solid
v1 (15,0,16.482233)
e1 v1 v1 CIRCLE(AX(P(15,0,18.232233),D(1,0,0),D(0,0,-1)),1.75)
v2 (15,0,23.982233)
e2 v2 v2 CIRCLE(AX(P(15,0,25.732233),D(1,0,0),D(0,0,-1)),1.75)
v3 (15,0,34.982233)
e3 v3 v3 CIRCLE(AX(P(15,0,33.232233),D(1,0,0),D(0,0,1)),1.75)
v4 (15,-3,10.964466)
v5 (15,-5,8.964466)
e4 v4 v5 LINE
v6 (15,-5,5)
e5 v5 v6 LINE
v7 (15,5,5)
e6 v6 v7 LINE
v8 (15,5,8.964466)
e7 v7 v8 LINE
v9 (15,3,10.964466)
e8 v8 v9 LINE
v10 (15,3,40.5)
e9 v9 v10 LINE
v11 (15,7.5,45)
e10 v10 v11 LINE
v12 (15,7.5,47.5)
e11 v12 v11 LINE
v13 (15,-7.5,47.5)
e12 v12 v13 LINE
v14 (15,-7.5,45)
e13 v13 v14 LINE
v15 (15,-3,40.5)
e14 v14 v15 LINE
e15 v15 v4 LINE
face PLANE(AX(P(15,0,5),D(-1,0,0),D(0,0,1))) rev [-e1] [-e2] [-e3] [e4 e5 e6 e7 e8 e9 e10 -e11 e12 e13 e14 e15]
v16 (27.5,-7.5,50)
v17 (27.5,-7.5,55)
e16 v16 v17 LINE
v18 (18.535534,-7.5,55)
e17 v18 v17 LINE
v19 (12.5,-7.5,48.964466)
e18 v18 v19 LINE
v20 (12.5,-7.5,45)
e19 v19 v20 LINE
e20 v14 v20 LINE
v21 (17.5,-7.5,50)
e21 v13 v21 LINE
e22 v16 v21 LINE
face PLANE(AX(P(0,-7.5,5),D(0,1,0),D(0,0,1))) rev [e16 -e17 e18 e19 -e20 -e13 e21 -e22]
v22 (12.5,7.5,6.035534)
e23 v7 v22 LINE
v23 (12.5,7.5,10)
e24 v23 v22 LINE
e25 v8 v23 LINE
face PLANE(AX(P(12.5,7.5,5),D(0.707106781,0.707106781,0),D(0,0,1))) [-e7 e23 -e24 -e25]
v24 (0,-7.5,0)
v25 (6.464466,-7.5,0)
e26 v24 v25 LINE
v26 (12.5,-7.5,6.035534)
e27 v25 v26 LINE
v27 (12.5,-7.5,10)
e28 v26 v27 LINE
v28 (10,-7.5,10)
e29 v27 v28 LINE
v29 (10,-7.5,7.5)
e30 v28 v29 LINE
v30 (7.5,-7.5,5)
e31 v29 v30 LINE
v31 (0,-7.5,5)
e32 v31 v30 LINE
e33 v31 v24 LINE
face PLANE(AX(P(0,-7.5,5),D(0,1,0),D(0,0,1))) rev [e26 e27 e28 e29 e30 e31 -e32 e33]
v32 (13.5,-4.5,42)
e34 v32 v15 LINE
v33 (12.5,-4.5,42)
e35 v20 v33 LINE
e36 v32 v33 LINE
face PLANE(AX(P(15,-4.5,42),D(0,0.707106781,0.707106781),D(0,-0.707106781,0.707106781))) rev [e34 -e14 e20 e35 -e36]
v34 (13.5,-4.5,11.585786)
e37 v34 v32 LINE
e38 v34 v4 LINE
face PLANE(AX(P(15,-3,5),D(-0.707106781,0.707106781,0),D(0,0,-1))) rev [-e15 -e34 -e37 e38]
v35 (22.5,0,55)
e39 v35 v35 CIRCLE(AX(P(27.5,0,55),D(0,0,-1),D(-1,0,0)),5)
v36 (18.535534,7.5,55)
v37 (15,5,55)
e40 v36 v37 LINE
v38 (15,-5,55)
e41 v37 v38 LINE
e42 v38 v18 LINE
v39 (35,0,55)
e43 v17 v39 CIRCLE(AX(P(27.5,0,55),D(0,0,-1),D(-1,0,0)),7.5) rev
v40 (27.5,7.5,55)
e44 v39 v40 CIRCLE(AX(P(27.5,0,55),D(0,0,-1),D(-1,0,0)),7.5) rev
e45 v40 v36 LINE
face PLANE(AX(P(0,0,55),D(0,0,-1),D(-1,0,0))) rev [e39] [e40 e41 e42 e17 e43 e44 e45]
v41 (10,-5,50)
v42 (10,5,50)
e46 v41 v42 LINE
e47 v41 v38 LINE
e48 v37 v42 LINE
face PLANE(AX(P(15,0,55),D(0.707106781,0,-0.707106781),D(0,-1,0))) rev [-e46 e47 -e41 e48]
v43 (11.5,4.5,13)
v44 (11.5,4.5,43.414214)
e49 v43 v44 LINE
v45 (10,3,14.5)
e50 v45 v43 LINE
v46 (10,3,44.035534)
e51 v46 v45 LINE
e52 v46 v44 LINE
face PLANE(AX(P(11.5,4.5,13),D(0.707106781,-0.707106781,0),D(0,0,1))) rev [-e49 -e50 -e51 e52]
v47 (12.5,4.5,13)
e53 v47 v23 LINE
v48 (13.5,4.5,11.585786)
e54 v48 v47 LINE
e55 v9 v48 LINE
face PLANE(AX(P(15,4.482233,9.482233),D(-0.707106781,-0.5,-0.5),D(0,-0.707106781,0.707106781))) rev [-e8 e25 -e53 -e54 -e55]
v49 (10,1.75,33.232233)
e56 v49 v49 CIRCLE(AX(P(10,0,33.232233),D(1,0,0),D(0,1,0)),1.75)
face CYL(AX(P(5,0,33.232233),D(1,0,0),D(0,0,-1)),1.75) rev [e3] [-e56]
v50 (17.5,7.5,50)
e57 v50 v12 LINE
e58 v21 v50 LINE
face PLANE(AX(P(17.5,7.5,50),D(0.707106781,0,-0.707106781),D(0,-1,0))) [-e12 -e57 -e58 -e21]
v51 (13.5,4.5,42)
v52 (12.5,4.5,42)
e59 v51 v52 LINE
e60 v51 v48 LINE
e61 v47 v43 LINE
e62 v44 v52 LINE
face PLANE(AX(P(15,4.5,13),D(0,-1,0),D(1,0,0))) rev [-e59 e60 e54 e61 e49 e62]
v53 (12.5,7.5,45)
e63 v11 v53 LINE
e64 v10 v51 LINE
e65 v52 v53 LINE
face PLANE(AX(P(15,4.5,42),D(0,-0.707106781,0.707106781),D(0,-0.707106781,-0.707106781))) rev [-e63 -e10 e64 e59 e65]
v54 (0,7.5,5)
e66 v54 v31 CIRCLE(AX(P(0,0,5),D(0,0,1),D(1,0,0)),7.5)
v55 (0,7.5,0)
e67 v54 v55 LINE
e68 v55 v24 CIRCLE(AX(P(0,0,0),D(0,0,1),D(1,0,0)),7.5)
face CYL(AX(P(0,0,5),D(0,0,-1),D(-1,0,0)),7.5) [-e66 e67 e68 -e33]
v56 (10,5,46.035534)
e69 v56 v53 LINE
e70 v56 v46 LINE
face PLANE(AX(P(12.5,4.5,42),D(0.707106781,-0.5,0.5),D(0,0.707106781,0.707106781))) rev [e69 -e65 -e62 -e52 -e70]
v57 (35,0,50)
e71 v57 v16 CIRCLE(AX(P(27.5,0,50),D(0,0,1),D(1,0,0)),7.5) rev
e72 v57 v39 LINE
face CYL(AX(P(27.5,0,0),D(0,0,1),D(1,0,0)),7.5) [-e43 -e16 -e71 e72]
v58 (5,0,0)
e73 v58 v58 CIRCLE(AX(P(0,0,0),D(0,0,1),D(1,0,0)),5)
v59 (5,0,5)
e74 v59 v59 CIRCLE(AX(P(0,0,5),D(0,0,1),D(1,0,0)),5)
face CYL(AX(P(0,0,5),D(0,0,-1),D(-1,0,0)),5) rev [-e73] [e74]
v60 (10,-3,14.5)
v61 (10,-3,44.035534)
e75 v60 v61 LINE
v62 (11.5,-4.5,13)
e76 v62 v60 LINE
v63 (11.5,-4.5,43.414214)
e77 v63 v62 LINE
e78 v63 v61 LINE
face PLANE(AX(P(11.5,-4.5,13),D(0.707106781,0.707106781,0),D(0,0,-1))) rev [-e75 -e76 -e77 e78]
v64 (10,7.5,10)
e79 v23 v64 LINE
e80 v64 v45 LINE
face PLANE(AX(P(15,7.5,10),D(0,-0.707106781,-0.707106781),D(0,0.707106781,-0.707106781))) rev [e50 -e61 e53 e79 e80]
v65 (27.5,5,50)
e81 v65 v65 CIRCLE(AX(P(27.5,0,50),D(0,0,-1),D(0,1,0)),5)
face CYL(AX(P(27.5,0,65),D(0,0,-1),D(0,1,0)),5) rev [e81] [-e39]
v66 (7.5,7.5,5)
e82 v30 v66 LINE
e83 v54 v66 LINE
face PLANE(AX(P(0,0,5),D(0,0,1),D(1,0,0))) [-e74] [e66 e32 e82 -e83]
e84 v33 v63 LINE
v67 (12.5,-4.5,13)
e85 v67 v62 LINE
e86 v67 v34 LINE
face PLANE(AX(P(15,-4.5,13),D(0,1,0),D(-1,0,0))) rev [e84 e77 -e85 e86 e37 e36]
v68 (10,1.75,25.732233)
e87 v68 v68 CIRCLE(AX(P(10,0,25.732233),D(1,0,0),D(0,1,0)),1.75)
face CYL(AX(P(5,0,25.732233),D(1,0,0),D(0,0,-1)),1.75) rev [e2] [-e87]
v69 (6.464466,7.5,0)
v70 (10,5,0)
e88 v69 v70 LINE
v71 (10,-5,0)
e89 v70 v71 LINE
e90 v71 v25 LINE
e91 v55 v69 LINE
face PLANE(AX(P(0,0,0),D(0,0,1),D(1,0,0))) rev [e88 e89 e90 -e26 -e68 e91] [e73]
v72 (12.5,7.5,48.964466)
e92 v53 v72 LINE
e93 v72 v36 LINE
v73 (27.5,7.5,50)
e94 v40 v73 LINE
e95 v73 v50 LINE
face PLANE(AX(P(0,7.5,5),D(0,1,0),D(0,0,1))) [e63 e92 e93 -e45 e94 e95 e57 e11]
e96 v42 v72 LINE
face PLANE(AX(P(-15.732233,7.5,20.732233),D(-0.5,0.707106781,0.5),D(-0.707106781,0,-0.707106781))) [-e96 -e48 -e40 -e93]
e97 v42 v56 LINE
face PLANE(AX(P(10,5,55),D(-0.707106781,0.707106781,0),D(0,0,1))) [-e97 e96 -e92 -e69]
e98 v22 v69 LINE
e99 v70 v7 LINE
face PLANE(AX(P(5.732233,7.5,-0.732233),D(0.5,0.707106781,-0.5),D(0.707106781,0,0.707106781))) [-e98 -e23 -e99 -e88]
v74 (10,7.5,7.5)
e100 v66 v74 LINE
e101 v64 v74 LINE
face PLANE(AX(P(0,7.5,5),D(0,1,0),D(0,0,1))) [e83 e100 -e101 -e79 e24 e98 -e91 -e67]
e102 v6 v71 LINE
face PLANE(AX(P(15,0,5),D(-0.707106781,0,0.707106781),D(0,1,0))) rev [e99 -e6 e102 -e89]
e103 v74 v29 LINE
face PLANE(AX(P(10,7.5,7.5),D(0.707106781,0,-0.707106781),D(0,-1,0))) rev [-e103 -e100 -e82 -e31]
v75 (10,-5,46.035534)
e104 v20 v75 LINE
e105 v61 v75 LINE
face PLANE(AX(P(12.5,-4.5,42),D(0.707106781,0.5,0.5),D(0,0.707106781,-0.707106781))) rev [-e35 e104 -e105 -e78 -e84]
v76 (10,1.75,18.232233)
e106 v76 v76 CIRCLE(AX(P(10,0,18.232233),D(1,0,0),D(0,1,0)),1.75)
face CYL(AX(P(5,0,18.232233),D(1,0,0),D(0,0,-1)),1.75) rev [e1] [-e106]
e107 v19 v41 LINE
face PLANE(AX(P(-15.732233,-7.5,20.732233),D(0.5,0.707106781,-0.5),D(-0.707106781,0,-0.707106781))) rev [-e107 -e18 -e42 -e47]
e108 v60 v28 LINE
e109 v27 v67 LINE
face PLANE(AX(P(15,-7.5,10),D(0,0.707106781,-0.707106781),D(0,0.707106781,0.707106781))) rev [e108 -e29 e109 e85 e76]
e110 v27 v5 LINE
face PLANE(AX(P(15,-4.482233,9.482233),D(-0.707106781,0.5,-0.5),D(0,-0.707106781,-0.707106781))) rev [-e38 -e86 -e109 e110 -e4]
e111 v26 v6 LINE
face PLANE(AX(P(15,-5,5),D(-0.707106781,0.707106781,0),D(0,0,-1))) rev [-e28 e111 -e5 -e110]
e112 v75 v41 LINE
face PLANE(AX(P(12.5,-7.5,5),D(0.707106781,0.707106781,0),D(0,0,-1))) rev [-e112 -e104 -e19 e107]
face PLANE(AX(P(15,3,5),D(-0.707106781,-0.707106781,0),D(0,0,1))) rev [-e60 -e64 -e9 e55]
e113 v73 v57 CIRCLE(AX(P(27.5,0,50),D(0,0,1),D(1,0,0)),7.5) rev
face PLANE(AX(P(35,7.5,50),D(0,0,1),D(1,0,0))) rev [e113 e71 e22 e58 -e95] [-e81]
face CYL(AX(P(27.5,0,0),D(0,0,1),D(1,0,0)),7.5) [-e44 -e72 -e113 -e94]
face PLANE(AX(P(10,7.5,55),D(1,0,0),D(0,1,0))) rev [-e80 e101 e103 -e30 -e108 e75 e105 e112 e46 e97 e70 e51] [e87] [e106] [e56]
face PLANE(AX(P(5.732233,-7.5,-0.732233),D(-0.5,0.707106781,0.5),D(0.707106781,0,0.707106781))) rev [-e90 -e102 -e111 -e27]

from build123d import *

# Parameters (mm, degrees)
SKETCH1_R           = 7.5
SKETCH1_R_2         = 5
BOSS_EXTRUDE1_DEPTH = 5
SKETCH2_W           = 5
SKETCH2_H           = 15
BOSS_EXTRUDE2_DEPTH = 50
SKETCH3_W           = 5
SKETCH3_H           = 15
BOSS_EXTRUDE3_DEPTH = 20
SKETCH4_R           = 5
CUT_EXTRUDE1_DEPTH  = 15
FILLET1_R           = 7.5
CHAMFER1_SIZE       = 5
CUT_EXTRUDE2_DEPTH  = 5
CHAMFER2_SIZE       = 1.5
CHAMFER3_SIZE       = 2.5
CHAMFER4_SIZE       = 2.5
SKETCH10_R          = 1.75
CUT_EXTRUDE4_DEPTH  = 10


with BuildPart() as part:
    # Sketch1 → Boss-Extrude1 (new body)
    # profile 1 of 2: a face of its own
    with BuildSketch(Plane.XY):
        Circle(SKETCH1_R)
        Circle(SKETCH1_R_2, mode=Mode.SUBTRACT)
    # profile 2 of 2: a face of its own
    with BuildSketch(Plane.XY):
        with BuildLine():
            Line((15, 7.5), (0, 7.5))
            ThreePointArc((0, 7.5), (5.303300859, 5.303300859), (7.5, 0))
            ThreePointArc((7.5, 0), (5.303300859, -5.303300859), (0, -7.5))
            Line((0, -7.5), (15, -7.5))
            Line((15, -7.5), (15, 7.5))
        make_face()
    extrude(amount=BOSS_EXTRUDE1_DEPTH)

    # Sketch2 → Boss-Extrude2 (add)
    with BuildSketch(Plane.XY.offset(5)):
        with Locations((12.5, 0)):
            Rectangle(SKETCH2_W, SKETCH2_H)
    extrude(amount=BOSS_EXTRUDE2_DEPTH)

    # Sketch3 → Boss-Extrude3 (add)
    with BuildSketch(Plane(origin=(15, 0, 0), x_dir=(0, 0, -1), z_dir=(1, 0, 0))):
        with Locations((-52.5, 0)):
            Rectangle(SKETCH3_W, SKETCH3_H)
    extrude(amount=BOSS_EXTRUDE3_DEPTH)

    # Sketch4 → Cut-Extrude1 (cut)
    with BuildSketch(Plane(origin=(0, 0, 50), x_dir=(-1, 0, 0), z_dir=(0, 0, -1))):
        with Locations(Location((-27.5, 0, 0), (0, 0, 90))):
            Circle(SKETCH4_R)
    extrude(amount=-CUT_EXTRUDE1_DEPTH, mode=Mode.SUBTRACT)

    # Fillet1
    fillet1_edges = [part.edges().sort_by_distance(p)[0] for p in [
        (35, -7.5, 52.5),
        (35, 7.5, 52.5),
    ]]
    fillet(fillet1_edges, radius=FILLET1_R - 0.0001)  # a hair under: the kernel refuses the full size

    # Chamfer1
    chamfer1_edges = [part.edges().sort_by_distance(p)[0] for p in [
        (10, 0, 55),
        (15, 0, 0),
    ]]
    chamfer(chamfer1_edges, length=CHAMFER1_SIZE)

    # Sketch5 → Cut-Extrude2 (cut)
    with BuildSketch(Plane.ZY.offset(-10)):
        Polygon((10, -7.5), (13, -4.5), (42, -4.5), (45, -7.5), align=None)
        Polygon((45, 7.5), (10, 7.5), (13, 4.5), (42, 4.5), align=None)
    extrude(amount=-CUT_EXTRUDE2_DEPTH, mode=Mode.SUBTRACT)

    # Chamfer2
    chamfer2_edges = [part.edges().sort_by_distance(p)[0] for p in [
        (15, -4.5, 27.5),
        (10, -4.5, 27.5),
        (15, 4.5, 27.5),
        (10, 4.5, 27.5),
    ]]
    chamfer(chamfer2_edges, length=CHAMFER2_SIZE)

    # Chamfer3
    chamfer3_edges = [part.edges().sort_by_distance(p)[0] for p in [
        (10, 7.5, 47.5),
        (12.5, 7.5, 52.5),
        (12.5, 7.5, 2.5),
        (10, -7.5, 47.5),
        (12.5, -7.5, 52.5),
        (12.5, -7.5, 2.5),
        (15, 7.5, 7.5),
        (15, -7.5, 7.5),
        (15, -5.25, 12.25),
        (10, -5.25, 42.75),
        (15, 5.25, 12.25),
        (10, 5.25, 42.75),
    ]]
    chamfer(chamfer3_edges, length=CHAMFER3_SIZE)

    # Chamfer4
    chamfer4_edges = [part.edges().sort_by_distance(p)[0] for p in [
        (10, 0, 5),
        (15, 0, 50),
    ]]
    chamfer(chamfer4_edges, length=CHAMFER4_SIZE)

    # Sketch10 → Cut-Extrude4 (cut)
    with BuildSketch(Plane(origin=(15, 0, 0), x_dir=(0, 0, -1), z_dir=(1, 0, 0))):
        with Locations((-25.732233047, 0)):
            Circle(SKETCH10_R)
        with Locations((-18.232233047, 0)):
            Circle(SKETCH10_R)
        with Locations(Location((-33.232233047, 0, 0), (0, 0, 90))):
            Circle(SKETCH10_R)
    extrude(amount=-CUT_EXTRUDE4_DEPTH, mode=Mode.SUBTRACT)


solid = part.part
